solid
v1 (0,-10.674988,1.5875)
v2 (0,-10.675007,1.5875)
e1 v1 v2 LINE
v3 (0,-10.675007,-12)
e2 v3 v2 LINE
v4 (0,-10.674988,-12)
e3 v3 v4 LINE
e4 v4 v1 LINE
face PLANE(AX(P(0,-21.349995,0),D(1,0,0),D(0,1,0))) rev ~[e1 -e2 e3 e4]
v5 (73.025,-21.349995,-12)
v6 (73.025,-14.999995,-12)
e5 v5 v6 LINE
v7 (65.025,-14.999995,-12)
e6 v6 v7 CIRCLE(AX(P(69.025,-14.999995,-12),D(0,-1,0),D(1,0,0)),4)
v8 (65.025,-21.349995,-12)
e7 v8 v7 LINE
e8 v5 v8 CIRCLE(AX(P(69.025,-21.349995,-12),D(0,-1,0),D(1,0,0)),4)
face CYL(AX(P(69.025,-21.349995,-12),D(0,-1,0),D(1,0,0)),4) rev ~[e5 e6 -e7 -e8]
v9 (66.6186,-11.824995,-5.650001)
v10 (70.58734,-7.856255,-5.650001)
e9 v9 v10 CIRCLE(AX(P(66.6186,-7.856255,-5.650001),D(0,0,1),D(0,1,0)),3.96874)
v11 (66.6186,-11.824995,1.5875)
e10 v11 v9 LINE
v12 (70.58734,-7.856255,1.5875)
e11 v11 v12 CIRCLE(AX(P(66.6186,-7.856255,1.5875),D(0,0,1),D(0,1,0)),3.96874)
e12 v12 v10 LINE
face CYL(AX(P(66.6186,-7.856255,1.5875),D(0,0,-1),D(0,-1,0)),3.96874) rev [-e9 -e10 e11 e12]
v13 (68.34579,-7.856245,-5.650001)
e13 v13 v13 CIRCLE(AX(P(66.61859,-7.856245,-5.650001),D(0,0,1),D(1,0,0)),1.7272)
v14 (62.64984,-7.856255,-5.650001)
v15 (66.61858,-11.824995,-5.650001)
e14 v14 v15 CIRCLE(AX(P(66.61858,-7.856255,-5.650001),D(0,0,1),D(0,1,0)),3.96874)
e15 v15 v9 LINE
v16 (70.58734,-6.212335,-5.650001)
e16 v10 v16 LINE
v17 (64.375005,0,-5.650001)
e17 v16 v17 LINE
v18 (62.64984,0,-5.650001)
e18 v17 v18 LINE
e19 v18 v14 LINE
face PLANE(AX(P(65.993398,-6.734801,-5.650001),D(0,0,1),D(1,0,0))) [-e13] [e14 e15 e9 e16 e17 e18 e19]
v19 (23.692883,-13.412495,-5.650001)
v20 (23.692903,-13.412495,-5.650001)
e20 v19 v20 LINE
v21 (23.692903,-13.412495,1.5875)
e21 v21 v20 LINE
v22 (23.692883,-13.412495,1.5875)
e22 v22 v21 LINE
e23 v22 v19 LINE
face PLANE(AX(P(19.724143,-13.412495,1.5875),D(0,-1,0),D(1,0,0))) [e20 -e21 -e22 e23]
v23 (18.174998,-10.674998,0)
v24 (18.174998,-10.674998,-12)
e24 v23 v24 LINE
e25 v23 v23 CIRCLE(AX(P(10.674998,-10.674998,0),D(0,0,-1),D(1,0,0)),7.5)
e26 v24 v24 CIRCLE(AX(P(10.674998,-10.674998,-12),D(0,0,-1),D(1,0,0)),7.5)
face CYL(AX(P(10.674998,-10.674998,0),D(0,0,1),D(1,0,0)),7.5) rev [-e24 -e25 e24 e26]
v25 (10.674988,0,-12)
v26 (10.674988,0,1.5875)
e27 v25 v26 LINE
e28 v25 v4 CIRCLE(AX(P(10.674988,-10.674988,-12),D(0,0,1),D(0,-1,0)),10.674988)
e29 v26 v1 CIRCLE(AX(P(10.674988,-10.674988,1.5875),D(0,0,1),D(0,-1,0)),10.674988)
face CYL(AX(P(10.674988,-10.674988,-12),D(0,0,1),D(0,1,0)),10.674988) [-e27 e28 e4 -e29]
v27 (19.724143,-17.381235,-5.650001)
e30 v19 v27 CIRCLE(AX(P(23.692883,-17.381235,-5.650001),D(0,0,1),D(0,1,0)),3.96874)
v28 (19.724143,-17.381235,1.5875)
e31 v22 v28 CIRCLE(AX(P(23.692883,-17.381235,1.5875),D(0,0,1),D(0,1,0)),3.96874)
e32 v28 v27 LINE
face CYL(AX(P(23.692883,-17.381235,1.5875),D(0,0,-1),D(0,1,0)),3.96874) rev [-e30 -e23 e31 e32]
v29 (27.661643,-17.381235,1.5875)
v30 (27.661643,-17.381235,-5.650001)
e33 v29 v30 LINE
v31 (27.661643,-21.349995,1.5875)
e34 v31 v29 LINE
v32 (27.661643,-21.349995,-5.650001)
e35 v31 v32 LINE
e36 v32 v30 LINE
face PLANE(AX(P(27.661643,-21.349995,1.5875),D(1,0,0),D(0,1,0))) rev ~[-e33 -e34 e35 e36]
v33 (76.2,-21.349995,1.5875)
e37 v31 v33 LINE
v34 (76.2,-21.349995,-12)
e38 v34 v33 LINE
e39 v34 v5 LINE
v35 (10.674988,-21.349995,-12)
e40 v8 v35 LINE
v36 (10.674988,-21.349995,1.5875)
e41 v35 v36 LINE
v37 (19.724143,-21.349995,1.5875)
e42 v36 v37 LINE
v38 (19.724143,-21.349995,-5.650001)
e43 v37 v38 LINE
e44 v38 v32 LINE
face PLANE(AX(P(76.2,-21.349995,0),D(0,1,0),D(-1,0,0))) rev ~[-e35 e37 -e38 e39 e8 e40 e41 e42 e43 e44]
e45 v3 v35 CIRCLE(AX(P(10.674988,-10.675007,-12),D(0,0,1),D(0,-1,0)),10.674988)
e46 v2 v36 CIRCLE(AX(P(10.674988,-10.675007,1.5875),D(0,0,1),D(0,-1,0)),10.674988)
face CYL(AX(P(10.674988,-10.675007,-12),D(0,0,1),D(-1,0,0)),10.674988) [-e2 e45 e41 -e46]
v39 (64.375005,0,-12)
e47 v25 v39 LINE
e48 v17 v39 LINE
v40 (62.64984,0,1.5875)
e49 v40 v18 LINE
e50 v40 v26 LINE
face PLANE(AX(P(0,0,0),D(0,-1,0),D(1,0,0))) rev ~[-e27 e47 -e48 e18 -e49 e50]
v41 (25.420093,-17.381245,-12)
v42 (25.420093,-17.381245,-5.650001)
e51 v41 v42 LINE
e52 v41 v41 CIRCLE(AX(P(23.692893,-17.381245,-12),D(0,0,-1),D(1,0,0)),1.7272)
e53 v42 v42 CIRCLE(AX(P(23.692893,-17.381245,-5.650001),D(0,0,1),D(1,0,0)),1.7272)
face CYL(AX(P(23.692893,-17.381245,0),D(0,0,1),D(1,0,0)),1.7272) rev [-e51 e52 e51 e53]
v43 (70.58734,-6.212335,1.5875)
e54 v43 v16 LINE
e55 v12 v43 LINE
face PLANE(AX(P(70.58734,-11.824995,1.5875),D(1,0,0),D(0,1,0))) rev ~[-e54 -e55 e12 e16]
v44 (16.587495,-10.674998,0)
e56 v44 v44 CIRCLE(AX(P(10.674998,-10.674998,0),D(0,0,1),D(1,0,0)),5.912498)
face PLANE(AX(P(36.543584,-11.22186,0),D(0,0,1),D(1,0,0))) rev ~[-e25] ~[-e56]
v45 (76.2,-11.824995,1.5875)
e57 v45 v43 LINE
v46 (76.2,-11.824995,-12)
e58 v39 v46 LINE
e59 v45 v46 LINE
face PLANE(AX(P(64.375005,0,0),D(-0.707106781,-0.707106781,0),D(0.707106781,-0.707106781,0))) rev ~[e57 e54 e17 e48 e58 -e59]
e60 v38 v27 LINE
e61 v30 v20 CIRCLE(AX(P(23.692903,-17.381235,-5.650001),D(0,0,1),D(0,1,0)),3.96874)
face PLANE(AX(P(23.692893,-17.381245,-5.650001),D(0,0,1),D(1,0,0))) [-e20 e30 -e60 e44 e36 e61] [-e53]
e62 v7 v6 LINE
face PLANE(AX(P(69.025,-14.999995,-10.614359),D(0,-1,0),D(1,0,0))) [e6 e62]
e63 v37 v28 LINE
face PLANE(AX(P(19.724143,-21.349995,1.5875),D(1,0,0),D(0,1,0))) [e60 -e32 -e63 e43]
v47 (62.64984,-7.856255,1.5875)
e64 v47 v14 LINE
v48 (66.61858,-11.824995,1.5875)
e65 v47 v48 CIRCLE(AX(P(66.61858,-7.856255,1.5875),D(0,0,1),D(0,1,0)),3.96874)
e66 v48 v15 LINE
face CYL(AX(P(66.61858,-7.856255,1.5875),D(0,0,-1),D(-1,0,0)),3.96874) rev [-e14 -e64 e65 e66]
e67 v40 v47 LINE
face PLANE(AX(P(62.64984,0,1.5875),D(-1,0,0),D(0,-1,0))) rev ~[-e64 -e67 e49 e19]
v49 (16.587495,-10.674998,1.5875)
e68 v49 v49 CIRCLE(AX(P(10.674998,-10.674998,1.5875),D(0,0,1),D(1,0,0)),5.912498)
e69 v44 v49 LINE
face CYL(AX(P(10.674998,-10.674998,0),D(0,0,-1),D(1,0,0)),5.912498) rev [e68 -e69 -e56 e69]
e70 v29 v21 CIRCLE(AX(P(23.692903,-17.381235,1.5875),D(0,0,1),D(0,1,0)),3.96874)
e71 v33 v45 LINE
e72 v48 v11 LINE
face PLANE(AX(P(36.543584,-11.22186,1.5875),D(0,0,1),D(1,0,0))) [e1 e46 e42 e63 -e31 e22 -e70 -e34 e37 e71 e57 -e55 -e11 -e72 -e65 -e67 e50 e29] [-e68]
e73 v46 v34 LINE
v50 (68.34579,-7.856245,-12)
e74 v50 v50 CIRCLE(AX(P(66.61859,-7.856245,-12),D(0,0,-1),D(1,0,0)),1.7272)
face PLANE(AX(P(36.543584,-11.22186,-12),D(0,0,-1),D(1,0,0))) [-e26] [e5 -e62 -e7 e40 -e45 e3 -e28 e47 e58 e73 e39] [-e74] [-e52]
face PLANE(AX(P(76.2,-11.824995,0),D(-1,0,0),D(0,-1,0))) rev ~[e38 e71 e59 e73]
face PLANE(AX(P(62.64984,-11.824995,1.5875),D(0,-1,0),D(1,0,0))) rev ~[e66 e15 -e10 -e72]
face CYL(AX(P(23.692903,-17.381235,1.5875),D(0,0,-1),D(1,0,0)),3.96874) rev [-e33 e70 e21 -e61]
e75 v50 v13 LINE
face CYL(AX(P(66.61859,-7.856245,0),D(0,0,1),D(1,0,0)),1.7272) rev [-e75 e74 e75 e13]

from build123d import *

# Parameters (mm, degrees)
F0_R     = 1.7272
F0_R_2   = 5.9124977
F1_DEPTH = 1.5875
F2_R     = 1.7272
F2_R_2   = 7.5
F3_DEPTH = 12
F5_DEPTH = 6.35
F6_R     = 10.674988
F7_W     = 7.9375
F7_H     = 7.9375
F8_DEPTH = 7.2375014
F9_R     = 3.96874


# Not quite as in the source:
# - a fillet or chamfer is up to 0.001 mm smaller than in the source, because OpenCascade refuses the exact size


with BuildPart() as f1:
    # F0 (on Top) → F1 (new body)
    with BuildSketch(Plane.XY):
        Polygon((64.3750046, 0), (0, 0), (0, -21.3499954), (76.2, -21.3499954), (76.2, -11.8249954), align=None)
        with Locations((23.692892633, -17.3812454)):
            Circle(F0_R, mode=Mode.SUBTRACT)
        with Locations((10.6749977, -10.6749977)):
            Circle(F0_R_2, mode=Mode.SUBTRACT)
        with Locations((66.6185899243, -7.8562454)):
            Circle(F0_R, mode=Mode.SUBTRACT)
    extrude(amount=F1_DEPTH)

    # F2 (on face) → F3 (join)
    with BuildSketch(Plane(origin=(0, 0, 0), x_dir=(1, 0, 0), z_dir=(0, 0, -1))):
        Polygon((0, 0), (64.3750046, 0), (76.2, 11.8249954), (76.2, 21.3499954), (0, 21.3499954), align=None)
        with Locations((66.6185899243, 7.8562454)):
            Circle(F2_R, mode=Mode.SUBTRACT)
        with Locations((10.6749977, 10.6749977)):
            Circle(F2_R_2, mode=Mode.SUBTRACT)
        with Locations((23.692892633, 17.3812454)):
            Circle(F2_R, mode=Mode.SUBTRACT)
    extrude(amount=F3_DEPTH)

    # F4 (on face) → F5 (cut)
    with BuildSketch(Plane.XZ.offset(21.3499954)):
        with BuildLine():
            Line((65.025, -12), (73.025, -12))
            ThreePointArc((73.025, -12), (69.025, -8), (65.025, -12))
        make_face()
    extrude(amount=-F5_DEPTH, mode=Mode.SUBTRACT)

    # F6 (radius 10.6749977 in the source; OpenCascade refuses exactly that, so slightly less here)
    f6_edges = [f1.edges().sort_by_distance(p)[0] for p in [
        (0, -21.349995, -5.20625),
        (0, 0, -5.20625),
    ]]
    fillet(f6_edges, radius=F6_R)

    # F7 (on face) → F8 (cut)
    with BuildSketch(Plane.XY.offset(1.5875)):
        with Locations((23.692892633, -17.3812454)):
            Rectangle(F7_W, F7_H)
        Polygon((64.3750046, 0), (62.6498399243, 0), (62.6498399243, -11.8249954), (70.5873399243, -11.8249954), (70.5873399243, -6.2123353243), align=None)
    extrude(amount=-F8_DEPTH, mode=Mode.SUBTRACT)

    # F9 (radius 3.96875 in the source; OpenCascade refuses exactly that, so slightly less here)
    f9_edges = [f1.edges().sort_by_distance(p)[0] for p in [
        (27.661643, -13.412495, -2.031251),
        (19.724143, -13.412495, -2.031251),
        (62.64984, -11.824995, -2.031251),
        (70.58734, -11.824995, -2.031251),
    ]]
    fillet(f9_edges, radius=F9_R)


solid = f1.part
